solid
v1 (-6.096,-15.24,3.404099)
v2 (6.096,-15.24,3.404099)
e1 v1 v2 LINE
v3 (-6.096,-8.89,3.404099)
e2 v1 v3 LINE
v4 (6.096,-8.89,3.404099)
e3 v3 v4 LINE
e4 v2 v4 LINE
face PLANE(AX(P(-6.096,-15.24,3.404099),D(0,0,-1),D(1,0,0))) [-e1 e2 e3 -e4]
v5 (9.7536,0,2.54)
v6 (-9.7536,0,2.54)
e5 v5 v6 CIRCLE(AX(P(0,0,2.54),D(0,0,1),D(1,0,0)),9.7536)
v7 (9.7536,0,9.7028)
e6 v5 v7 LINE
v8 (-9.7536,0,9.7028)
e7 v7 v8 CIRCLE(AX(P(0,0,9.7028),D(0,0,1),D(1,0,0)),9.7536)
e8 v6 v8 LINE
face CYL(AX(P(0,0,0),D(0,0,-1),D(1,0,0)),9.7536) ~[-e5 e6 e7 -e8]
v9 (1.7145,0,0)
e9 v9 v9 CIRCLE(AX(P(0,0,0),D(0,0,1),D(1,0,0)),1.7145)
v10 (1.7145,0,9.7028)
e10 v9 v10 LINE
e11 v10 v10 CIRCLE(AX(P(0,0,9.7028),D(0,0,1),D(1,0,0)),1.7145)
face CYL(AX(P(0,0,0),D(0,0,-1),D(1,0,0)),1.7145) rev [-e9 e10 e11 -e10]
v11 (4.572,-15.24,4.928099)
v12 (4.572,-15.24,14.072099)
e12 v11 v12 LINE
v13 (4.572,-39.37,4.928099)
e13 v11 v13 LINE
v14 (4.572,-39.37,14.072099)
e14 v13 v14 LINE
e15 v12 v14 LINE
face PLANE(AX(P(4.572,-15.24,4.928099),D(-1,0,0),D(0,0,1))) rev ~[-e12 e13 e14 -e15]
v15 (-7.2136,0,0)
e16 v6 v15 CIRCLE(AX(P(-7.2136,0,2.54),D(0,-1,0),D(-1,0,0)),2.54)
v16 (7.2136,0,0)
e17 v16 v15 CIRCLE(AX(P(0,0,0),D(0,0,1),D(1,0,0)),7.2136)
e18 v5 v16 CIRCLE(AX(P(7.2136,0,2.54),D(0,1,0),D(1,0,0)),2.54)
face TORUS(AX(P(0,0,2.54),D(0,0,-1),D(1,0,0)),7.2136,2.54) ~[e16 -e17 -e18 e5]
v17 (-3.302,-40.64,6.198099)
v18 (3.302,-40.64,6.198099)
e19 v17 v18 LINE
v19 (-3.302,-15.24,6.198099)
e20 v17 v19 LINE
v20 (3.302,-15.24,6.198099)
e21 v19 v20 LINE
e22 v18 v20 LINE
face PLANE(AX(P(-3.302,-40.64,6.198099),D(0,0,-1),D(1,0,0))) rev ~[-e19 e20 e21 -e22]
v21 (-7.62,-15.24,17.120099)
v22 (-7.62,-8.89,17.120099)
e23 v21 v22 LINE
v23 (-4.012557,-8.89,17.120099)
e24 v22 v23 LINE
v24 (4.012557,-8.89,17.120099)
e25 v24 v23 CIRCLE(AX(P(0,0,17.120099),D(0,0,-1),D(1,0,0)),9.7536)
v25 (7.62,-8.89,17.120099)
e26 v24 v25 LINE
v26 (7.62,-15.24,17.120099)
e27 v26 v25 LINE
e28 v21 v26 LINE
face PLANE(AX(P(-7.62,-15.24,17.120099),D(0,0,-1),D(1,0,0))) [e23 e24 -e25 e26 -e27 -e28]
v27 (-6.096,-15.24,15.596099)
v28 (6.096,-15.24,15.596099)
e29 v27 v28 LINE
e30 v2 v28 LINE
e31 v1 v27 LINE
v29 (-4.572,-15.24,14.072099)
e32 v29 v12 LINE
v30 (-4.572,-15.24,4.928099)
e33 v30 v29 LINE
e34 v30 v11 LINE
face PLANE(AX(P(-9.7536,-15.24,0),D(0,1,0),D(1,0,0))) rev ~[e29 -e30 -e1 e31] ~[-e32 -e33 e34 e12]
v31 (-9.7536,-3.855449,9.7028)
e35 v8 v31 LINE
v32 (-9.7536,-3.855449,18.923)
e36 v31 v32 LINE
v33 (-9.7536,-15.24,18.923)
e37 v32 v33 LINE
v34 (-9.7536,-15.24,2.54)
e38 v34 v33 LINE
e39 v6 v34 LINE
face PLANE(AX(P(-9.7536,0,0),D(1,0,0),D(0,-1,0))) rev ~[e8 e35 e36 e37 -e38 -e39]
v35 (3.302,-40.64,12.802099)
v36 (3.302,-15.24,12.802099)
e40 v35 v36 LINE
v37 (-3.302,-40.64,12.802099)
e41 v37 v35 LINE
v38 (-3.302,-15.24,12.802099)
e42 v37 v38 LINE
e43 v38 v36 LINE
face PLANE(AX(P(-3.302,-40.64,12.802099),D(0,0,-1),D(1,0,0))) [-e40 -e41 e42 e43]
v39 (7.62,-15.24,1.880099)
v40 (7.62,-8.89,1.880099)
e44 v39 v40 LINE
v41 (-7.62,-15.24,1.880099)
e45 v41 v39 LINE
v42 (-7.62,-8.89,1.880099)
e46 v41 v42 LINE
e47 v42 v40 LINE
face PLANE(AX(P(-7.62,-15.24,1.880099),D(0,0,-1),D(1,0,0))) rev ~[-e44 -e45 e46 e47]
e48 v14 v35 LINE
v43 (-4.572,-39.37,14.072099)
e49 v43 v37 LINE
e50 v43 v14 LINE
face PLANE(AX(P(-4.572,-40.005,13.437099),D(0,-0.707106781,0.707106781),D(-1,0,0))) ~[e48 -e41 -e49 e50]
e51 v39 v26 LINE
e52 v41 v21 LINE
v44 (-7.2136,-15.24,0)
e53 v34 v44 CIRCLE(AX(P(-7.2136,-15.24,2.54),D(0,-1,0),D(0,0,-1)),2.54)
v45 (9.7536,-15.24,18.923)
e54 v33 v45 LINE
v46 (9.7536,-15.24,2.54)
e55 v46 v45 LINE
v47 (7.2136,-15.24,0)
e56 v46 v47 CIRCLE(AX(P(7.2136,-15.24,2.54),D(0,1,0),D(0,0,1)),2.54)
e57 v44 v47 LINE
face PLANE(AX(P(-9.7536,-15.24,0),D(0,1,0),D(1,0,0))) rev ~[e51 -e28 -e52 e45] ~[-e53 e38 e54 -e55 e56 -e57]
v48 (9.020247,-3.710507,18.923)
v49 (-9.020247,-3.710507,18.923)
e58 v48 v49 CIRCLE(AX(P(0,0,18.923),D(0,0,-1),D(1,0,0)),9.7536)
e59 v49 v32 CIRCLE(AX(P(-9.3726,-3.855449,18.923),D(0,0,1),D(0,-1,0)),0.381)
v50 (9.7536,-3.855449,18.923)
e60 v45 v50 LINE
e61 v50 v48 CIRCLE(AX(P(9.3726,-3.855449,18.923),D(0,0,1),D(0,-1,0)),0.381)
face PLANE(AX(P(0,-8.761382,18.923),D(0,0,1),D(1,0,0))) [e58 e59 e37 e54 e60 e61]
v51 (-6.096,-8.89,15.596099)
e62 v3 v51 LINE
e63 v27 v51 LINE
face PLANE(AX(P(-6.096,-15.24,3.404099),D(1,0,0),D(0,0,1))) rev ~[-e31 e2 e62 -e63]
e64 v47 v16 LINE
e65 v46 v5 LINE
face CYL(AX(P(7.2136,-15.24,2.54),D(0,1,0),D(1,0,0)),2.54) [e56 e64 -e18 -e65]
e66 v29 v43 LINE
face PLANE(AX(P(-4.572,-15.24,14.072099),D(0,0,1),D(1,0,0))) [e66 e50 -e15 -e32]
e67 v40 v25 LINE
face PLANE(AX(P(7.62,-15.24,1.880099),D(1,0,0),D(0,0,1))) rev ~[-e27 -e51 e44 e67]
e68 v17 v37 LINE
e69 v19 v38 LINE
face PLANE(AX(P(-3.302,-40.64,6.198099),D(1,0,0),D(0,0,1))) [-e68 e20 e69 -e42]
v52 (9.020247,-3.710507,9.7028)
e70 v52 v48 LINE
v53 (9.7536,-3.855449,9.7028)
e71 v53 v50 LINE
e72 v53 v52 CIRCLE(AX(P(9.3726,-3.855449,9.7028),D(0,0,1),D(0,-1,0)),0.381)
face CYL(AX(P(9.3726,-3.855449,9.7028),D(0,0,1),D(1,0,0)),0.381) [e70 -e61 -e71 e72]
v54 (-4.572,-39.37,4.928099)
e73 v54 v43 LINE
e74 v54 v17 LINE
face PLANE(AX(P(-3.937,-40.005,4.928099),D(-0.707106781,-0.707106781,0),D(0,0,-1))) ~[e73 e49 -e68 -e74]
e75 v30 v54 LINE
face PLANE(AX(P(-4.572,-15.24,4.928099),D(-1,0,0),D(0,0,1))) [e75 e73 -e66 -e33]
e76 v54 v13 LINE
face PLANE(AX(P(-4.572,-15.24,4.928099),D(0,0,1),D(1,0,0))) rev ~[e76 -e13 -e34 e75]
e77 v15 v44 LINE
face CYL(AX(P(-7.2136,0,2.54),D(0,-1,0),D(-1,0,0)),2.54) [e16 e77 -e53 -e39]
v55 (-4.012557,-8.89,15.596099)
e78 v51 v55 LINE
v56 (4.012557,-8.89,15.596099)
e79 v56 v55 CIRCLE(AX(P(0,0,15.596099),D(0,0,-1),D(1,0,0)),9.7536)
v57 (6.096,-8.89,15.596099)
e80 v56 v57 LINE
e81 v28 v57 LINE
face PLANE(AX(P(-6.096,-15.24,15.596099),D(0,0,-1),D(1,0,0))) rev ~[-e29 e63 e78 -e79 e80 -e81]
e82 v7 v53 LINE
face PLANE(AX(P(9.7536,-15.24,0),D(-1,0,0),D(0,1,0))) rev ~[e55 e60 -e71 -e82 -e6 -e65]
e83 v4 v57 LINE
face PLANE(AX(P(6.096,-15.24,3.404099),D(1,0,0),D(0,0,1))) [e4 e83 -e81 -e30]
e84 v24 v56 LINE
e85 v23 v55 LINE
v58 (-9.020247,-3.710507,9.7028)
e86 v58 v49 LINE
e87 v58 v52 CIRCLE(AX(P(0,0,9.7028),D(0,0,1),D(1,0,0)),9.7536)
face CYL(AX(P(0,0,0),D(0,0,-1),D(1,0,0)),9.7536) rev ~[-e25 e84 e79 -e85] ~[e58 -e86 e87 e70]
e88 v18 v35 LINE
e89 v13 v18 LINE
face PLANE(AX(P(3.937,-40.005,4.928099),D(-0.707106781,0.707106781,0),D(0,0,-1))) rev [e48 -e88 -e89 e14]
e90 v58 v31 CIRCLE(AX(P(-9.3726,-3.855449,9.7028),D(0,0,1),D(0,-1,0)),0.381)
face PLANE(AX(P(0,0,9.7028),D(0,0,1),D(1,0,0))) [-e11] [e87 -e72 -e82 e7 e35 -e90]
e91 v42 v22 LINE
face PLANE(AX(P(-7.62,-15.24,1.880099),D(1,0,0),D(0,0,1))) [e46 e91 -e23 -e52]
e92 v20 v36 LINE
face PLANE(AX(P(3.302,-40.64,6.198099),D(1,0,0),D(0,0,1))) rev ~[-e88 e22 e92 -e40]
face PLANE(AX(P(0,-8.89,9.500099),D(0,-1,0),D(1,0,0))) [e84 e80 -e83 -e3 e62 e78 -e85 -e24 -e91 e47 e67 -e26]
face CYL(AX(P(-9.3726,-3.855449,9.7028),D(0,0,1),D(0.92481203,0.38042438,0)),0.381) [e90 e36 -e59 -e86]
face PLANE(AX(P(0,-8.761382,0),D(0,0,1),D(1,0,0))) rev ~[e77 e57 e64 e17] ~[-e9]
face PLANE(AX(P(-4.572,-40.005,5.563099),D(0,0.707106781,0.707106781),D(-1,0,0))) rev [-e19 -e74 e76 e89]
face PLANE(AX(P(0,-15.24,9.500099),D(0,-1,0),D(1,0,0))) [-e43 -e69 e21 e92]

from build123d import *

# Parameters (mm, degrees)
F0_R     = 1.7145
F1_DEPTH = 9.7028
F2_DEPTH = 18.923
F3_F1_R  = 0.381
F3_F2_R  = 0.381
F4_W     = 9.144
F4_H     = 9.144
F5_DEPTH = 25.4
F6_SIZE  = 1.27
F8_DEPTH = 25.4
F4_W_2   = 15.24
F4_H_2   = 15.24
F4_W_3   = 12.192
F4_H_3   = 12.192
F9_DEPTH = 6.35
F10_R    = 2.54


with BuildPart() as f1:
    # F0 (on Top) → F1 (new body)
    with BuildSketch(Plane.XY):
        with BuildLine():
            ThreePointArc((-9.7536, 0), (0, -9.7536), (9.7536, 0))
            ThreePointArc((9.7536, 0), (0, 9.7536), (-9.7536, 0))
        make_face()
        Circle(F0_R, mode=Mode.SUBTRACT)
    extrude(amount=F1_DEPTH)

    # F0 (on Top) → F2 (join)
    with BuildSketch(Plane.XY):
        with BuildLine():
            Line((9.7536, -15.24), (9.7536, 0))
            ThreePointArc((9.7536, 0), (0, -9.7536), (-9.7536, 0))
            Line((-9.7536, 0), (-9.7536, -15.24))
            Line((-9.7536, -15.24), (9.7536, -15.24))
        make_face()
    extrude(amount=F2_DEPTH)

    # F3: fillet of radius 0.381 on 3 edges, made by hand

    # F3_f1
    f3_f1_edges = [f1.edges().sort_by_distance(p)[0] for p in [
        (9.7536, 0, 14.3129),
    ]]
    fillet(f3_f1_edges, radius=F3_F1_R)

    # F3_f2
    f3_f2_edges = [f1.edges().sort_by_distance(p)[0] for p in [
        (-9.7536, 0, 14.3129),
    ]]
    fillet(f3_f2_edges, radius=F3_F2_R)

    # F4 (on face) → F5 (join)
    with BuildSketch(Plane.XZ.offset(15.24)):
        with Locations((0, 9.500099346)):
            Rectangle(F4_W, F4_H)
    extrude(amount=F5_DEPTH)

    # F6
    f6_edges = [f1.edges().sort_by_distance(p)[0] for p in [
        (0, -40.64, 4.928099),
        (4.572, -40.64, 9.500099),
        (0, -40.64, 14.072099),
        (-4.572, -40.64, 9.500099),
    ]]
    chamfer(f6_edges, length=F6_SIZE)

    # F8 (cut): a face of the model
    f8_faces = [f1.faces().sort_by_distance(p)[0] for p in [
        (0, -40.64, 9.500099346),
    ]]
    extrude(f8_faces, amount=-F8_DEPTH, mode=Mode.SUBTRACT)

    # F4 (on face) → F9 (cut)
    with BuildSketch(Plane.XZ.offset(15.24)):
        with Locations((0, 9.500099346)):
            Rectangle(F4_W_2, F4_H_2)
        with Locations((0, 9.500099346)):
            Rectangle(F4_W_3, F4_H_3, mode=Mode.SUBTRACT)
    extrude(amount=-F9_DEPTH, mode=Mode.SUBTRACT)

    # F10
    f10_edges = [f1.edges().sort_by_distance(p)[0] for p in [
        (0, 9.7536, 0),
        (9.7536, -7.62, 0),
        (-9.7536, -7.62, 0),
    ]]
    fillet(f10_edges, radius=F10_R)


solid = f1.part
